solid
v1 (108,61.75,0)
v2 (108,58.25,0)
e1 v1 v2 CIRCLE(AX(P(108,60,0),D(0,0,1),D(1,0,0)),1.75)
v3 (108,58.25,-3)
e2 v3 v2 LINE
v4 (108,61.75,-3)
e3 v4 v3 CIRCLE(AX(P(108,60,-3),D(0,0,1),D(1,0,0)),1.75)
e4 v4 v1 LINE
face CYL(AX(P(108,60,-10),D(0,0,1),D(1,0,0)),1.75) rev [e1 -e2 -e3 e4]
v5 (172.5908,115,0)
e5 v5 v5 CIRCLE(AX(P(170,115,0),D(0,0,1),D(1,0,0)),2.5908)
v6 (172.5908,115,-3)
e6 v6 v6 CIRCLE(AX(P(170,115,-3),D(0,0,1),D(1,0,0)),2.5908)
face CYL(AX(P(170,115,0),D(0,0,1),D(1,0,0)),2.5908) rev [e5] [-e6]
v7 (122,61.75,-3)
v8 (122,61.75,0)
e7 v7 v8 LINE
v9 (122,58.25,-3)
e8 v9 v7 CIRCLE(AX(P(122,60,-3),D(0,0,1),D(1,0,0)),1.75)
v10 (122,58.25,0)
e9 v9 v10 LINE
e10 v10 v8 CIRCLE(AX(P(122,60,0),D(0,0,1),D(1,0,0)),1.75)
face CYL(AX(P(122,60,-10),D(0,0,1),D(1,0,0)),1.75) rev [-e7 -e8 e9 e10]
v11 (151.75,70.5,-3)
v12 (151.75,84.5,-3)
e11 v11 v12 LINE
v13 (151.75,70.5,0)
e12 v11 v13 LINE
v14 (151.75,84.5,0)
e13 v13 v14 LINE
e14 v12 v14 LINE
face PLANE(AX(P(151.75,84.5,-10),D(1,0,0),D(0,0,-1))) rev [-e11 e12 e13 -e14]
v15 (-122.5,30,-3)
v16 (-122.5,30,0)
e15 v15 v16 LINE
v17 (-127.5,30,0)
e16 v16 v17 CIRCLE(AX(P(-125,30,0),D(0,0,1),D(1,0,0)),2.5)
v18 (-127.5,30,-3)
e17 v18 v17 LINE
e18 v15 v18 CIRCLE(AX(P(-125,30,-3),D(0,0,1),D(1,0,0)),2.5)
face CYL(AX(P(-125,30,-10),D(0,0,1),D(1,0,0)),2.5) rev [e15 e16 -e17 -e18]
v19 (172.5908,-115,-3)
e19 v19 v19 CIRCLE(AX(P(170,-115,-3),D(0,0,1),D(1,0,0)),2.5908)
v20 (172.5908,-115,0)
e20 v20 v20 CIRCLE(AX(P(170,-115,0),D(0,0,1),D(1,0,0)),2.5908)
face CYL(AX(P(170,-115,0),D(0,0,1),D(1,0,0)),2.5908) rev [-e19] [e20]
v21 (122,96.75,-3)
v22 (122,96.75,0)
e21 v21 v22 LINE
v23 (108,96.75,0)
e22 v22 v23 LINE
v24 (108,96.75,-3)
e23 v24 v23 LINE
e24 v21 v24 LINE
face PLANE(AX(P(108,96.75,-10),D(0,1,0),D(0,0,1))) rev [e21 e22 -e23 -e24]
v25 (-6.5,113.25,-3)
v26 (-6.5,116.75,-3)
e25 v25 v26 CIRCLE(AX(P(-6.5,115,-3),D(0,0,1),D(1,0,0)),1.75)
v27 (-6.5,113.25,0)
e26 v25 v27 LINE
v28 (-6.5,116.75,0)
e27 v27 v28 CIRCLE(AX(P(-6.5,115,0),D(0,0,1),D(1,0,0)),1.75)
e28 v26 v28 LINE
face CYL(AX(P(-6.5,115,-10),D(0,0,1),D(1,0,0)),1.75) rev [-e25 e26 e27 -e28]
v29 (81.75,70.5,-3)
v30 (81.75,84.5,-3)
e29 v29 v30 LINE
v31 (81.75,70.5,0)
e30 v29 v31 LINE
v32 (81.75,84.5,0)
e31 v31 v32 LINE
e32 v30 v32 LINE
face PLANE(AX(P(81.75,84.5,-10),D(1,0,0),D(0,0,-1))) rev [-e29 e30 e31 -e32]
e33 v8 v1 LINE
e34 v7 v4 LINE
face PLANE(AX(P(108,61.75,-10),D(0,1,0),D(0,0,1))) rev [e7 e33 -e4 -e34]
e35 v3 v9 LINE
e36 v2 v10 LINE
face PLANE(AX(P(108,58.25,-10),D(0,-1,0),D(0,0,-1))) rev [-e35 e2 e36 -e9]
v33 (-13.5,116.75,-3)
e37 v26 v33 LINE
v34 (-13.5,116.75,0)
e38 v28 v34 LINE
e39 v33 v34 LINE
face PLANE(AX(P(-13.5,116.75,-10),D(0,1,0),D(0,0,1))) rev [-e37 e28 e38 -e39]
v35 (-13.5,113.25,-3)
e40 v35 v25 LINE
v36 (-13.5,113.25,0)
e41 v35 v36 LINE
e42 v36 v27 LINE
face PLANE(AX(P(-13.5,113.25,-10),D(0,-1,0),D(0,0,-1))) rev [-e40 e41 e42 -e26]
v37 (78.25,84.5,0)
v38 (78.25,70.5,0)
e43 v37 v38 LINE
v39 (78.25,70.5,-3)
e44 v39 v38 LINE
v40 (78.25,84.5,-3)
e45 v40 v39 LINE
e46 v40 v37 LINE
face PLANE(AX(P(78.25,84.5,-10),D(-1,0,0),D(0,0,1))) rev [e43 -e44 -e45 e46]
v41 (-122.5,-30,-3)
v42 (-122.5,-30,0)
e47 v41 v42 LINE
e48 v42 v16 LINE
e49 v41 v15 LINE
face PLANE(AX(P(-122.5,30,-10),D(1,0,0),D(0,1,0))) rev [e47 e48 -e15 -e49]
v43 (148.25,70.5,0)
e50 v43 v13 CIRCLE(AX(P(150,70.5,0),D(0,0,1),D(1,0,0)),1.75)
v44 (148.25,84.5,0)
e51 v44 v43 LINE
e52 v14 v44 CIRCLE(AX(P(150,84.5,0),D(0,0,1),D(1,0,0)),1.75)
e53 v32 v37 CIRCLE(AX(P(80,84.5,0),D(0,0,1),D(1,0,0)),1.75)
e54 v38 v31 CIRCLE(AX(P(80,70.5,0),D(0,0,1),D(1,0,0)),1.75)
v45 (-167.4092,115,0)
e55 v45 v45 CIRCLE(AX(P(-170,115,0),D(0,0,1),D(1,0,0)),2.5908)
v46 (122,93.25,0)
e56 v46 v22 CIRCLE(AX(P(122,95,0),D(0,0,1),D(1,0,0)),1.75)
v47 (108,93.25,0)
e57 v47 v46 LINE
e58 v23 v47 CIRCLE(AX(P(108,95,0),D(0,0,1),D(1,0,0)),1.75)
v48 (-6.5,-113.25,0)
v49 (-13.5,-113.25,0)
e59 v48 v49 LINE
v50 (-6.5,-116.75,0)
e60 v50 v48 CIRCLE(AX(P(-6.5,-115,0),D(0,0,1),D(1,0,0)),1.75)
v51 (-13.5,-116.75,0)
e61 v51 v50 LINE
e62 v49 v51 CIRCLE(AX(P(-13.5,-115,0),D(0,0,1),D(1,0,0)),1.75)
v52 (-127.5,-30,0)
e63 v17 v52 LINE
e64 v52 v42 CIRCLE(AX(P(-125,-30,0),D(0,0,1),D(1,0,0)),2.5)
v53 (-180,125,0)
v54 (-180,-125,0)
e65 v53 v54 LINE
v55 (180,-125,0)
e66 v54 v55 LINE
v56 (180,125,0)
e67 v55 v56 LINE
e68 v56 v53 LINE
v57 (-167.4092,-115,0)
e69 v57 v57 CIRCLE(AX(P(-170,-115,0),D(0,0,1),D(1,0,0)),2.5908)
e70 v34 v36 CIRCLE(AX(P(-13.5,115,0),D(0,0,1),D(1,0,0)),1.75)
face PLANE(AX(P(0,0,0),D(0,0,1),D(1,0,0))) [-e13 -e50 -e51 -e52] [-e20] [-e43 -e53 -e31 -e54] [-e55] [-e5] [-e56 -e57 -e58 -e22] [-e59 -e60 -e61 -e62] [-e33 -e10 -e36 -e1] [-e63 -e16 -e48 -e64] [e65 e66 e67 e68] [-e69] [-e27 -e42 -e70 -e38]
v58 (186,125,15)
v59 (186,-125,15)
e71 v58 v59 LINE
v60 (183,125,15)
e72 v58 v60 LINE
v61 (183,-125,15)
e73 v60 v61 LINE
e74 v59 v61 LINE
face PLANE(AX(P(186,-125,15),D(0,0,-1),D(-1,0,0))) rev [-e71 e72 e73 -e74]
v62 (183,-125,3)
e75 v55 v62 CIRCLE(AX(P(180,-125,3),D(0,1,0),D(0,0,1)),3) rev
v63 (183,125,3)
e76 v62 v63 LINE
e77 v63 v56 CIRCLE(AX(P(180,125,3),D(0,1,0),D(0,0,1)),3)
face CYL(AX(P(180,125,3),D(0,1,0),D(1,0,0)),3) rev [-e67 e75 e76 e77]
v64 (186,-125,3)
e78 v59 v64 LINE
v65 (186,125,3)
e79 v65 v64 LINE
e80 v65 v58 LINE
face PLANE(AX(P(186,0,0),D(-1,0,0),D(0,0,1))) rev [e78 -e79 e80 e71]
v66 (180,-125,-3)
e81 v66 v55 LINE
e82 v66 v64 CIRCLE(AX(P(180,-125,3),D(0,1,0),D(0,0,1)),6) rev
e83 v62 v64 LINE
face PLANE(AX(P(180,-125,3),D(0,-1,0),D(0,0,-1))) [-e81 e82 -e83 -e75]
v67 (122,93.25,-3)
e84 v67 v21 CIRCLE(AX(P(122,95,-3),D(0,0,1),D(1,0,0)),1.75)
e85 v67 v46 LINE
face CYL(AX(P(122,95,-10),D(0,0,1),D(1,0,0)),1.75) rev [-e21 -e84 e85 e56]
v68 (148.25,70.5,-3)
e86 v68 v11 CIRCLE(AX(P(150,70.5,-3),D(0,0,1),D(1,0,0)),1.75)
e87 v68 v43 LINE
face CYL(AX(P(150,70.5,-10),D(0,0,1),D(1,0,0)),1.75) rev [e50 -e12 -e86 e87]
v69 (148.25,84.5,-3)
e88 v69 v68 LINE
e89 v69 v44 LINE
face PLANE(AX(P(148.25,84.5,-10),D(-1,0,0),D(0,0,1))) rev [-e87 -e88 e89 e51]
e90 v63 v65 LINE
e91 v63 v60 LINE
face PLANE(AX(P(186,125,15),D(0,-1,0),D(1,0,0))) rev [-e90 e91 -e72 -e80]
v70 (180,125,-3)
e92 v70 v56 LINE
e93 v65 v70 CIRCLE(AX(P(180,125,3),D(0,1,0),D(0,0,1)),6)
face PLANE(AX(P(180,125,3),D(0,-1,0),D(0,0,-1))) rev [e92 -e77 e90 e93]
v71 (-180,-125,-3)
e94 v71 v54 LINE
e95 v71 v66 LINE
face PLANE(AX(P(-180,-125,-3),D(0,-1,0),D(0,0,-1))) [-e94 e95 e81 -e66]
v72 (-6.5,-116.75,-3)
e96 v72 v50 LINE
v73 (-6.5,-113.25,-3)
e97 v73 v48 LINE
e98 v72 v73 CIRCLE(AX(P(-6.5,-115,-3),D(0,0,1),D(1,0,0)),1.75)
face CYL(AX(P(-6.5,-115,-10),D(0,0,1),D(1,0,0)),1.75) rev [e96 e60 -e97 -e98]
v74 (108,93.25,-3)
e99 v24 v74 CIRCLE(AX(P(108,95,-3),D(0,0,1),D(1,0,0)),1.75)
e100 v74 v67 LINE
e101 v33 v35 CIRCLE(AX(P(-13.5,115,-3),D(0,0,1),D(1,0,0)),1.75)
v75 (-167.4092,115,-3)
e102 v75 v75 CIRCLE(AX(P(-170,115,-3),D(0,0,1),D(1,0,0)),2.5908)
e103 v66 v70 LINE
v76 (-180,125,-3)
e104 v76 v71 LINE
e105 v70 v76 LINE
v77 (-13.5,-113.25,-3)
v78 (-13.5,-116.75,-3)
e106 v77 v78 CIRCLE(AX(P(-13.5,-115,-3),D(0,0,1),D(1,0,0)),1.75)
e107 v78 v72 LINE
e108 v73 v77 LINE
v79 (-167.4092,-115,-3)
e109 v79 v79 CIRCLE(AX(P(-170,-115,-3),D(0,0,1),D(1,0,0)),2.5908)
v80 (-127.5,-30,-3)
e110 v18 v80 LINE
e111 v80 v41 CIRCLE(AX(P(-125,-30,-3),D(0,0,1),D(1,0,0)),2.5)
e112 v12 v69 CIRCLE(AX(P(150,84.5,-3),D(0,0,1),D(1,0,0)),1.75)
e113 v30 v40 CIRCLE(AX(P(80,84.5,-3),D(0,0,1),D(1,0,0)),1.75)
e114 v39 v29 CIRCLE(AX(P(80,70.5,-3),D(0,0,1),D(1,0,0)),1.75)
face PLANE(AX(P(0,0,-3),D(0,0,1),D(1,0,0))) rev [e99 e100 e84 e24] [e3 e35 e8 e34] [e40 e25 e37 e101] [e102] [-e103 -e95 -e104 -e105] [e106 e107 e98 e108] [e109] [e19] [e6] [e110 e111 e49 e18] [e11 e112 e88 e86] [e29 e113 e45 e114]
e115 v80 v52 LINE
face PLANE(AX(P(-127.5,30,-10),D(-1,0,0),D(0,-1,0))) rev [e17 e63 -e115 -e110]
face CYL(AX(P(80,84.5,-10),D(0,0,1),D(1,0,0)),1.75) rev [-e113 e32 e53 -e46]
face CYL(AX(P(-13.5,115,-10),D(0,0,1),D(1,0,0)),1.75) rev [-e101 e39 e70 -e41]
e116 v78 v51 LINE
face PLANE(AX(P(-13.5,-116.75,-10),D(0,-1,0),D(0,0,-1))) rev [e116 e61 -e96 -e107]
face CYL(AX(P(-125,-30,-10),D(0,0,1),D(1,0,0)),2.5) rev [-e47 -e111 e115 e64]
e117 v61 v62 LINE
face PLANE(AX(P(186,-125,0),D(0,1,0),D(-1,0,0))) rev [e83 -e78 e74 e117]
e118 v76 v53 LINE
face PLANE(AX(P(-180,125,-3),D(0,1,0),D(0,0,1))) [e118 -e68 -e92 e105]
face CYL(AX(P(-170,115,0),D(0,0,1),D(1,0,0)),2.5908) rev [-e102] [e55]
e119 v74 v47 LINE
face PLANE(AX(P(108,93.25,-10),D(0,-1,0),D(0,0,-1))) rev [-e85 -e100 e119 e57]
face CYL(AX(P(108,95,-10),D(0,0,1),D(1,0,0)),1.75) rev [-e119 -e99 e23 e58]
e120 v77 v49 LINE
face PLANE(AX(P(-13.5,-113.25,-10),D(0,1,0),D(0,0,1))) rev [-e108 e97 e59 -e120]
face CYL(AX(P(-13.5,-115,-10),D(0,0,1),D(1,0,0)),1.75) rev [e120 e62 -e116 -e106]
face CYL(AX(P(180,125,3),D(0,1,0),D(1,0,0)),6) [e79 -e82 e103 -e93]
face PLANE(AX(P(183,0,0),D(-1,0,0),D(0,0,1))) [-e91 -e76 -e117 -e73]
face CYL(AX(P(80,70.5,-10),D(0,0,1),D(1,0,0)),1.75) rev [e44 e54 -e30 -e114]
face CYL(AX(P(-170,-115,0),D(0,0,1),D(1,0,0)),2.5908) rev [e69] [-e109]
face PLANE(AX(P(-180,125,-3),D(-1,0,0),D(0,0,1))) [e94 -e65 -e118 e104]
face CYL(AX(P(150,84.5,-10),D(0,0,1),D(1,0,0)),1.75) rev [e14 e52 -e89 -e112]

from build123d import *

# Parameters (mm, degrees)
SKETCH1_W                  = 360
SKETCH1_H                  = 250
BASE_FLANGE1_DEPTH         = 3
F_6_0_204_DIAMETER_SLOT1_D = 5.1816
CUT_EXTRUDE1_DEPTH         = 10
CUT_EXTRUDE2_DEPTH         = 10
CUT_EXTRUDE4_DEPTH         = 10
CUT_EXTRUDE5_DEPTH         = 10
CUT_EXTRUDE6_DEPTH         = 10
CUT_EXTRUDE7_DEPTH         = 10
CUT_EXTRUDE8_DEPTH         = 10
EDGE_FLANGE1_DEPTH         = 250


# Sheet-metal steps are written as plain solids
with BuildPart() as part:
    # Sketch1 → Base-Flange1 (new body)
    with BuildSketch(Plane.XY):
        Rectangle(SKETCH1_W, SKETCH1_H)
    extrude(amount=-BASE_FLANGE1_DEPTH)

    # #6 (0.204) Diameter Slot1 (through all)
    with Locations(Plane.XY):
        with Locations((-170, -115), (-170, 115), (170, 115), (170, -115)):
            Hole(F_6_0_204_DIAMETER_SLOT1_D / 2)

    # Sketch8 → Cut-Extrude1 (cut)
    with BuildSketch(Plane.XY):
        with BuildLine():
            Line((-13.5, -113.25), (-6.5, -113.25))
            ThreePointArc((-6.5, -113.25), (-4.75, -115), (-6.5, -116.75))
            Line((-6.5, -116.75), (-13.5, -116.75))
            ThreePointArc((-13.5, -116.75), (-15.25, -115), (-13.5, -113.25))
        make_face()
    extrude(amount=-CUT_EXTRUDE1_DEPTH, mode=Mode.SUBTRACT)

    # Sketch9 → Cut-Extrude2 (cut)
    with BuildSketch(Plane.XY):
        with BuildLine():
            Line((-13.5, 116.75), (-6.5, 116.75))
            ThreePointArc((-6.5, 116.75), (-4.75, 115), (-6.5, 113.25))
            Line((-6.5, 113.25), (-13.5, 113.25))
            ThreePointArc((-13.5, 113.25), (-15.25, 115), (-13.5, 116.75))
        make_face()
    extrude(amount=-CUT_EXTRUDE2_DEPTH, mode=Mode.SUBTRACT)

    # Sketch10 → Cut-Extrude4 (cut)
    with BuildSketch(Plane.XY):
        with BuildLine():
            Line((151.75, 84.5), (151.75, 70.5))
            ThreePointArc((151.75, 70.5), (150, 68.75), (148.25, 70.5))
            Line((148.25, 70.5), (148.25, 84.5))
            ThreePointArc((148.25, 84.5), (150, 86.25), (151.75, 84.5))
        make_face()
    extrude(amount=-CUT_EXTRUDE4_DEPTH, mode=Mode.SUBTRACT)

    # Sketch11 → Cut-Extrude5 (cut)
    with BuildSketch(Plane.XY):
        with BuildLine():
            Line((108, 96.75), (122, 96.75))
            ThreePointArc((122, 96.75), (123.75, 95), (122, 93.25))
            Line((122, 93.25), (108, 93.25))
            ThreePointArc((108, 93.25), (106.25, 95), (108, 96.75))
        make_face()
    extrude(amount=-CUT_EXTRUDE5_DEPTH, mode=Mode.SUBTRACT)

    # Sketch12 → Cut-Extrude6 (cut)
    with BuildSketch(Plane.XY):
        with BuildLine():
            Line((108, 61.75), (122, 61.75))
            ThreePointArc((122, 61.75), (123.75, 60), (122, 58.25))
            Line((122, 58.25), (108, 58.25))
            ThreePointArc((108, 58.25), (106.25, 60), (108, 61.75))
        make_face()
    extrude(amount=-CUT_EXTRUDE6_DEPTH, mode=Mode.SUBTRACT)

    # Sketch13 → Cut-Extrude7 (cut)
    with BuildSketch(Plane.XY):
        with BuildLine():
            Line((81.75, 84.5), (81.75, 70.5))
            ThreePointArc((81.75, 70.5), (80, 68.75), (78.25, 70.5))
            Line((78.25, 70.5), (78.25, 84.5))
            ThreePointArc((78.25, 84.5), (80, 86.25), (81.75, 84.5))
        make_face()
    extrude(amount=-CUT_EXTRUDE7_DEPTH, mode=Mode.SUBTRACT)

    # Sketch14 → Cut-Extrude8 (cut)
    with BuildSketch(Plane.XY):
        with BuildLine():
            Line((-122.5, 30), (-122.5, -30))
            ThreePointArc((-122.5, -30), (-125, -32.5), (-127.5, -30))
            Line((-127.5, -30), (-127.5, 30))
            ThreePointArc((-127.5, 30), (-125, 32.5), (-122.5, 30))
        make_face()
    extrude(amount=-CUT_EXTRUDE8_DEPTH, mode=Mode.SUBTRACT)

    # Edge-Flange1 section (across the edge) → Edge-Flange1 (add)
    with BuildSketch(Plane(origin=(183, -125, 0), x_dir=(-1, 0, 0), z_dir=(0, 1, 0))):
        with BuildLine():
            Line((-3, 3), (-3, 15))
            Line((-3, 15), (0, 15))
            Line((0, 15), (0, 3))
            ThreePointArc((0, 3), (0.878679656, 0.878679656), (3, 0))
            Line((3, 0), (3, -3))
            ThreePointArc((3, -3), (-1.242640687, -1.242640687), (-3, 3))
        make_face()
    extrude(amount=EDGE_FLANGE1_DEPTH)


solid = part.part
